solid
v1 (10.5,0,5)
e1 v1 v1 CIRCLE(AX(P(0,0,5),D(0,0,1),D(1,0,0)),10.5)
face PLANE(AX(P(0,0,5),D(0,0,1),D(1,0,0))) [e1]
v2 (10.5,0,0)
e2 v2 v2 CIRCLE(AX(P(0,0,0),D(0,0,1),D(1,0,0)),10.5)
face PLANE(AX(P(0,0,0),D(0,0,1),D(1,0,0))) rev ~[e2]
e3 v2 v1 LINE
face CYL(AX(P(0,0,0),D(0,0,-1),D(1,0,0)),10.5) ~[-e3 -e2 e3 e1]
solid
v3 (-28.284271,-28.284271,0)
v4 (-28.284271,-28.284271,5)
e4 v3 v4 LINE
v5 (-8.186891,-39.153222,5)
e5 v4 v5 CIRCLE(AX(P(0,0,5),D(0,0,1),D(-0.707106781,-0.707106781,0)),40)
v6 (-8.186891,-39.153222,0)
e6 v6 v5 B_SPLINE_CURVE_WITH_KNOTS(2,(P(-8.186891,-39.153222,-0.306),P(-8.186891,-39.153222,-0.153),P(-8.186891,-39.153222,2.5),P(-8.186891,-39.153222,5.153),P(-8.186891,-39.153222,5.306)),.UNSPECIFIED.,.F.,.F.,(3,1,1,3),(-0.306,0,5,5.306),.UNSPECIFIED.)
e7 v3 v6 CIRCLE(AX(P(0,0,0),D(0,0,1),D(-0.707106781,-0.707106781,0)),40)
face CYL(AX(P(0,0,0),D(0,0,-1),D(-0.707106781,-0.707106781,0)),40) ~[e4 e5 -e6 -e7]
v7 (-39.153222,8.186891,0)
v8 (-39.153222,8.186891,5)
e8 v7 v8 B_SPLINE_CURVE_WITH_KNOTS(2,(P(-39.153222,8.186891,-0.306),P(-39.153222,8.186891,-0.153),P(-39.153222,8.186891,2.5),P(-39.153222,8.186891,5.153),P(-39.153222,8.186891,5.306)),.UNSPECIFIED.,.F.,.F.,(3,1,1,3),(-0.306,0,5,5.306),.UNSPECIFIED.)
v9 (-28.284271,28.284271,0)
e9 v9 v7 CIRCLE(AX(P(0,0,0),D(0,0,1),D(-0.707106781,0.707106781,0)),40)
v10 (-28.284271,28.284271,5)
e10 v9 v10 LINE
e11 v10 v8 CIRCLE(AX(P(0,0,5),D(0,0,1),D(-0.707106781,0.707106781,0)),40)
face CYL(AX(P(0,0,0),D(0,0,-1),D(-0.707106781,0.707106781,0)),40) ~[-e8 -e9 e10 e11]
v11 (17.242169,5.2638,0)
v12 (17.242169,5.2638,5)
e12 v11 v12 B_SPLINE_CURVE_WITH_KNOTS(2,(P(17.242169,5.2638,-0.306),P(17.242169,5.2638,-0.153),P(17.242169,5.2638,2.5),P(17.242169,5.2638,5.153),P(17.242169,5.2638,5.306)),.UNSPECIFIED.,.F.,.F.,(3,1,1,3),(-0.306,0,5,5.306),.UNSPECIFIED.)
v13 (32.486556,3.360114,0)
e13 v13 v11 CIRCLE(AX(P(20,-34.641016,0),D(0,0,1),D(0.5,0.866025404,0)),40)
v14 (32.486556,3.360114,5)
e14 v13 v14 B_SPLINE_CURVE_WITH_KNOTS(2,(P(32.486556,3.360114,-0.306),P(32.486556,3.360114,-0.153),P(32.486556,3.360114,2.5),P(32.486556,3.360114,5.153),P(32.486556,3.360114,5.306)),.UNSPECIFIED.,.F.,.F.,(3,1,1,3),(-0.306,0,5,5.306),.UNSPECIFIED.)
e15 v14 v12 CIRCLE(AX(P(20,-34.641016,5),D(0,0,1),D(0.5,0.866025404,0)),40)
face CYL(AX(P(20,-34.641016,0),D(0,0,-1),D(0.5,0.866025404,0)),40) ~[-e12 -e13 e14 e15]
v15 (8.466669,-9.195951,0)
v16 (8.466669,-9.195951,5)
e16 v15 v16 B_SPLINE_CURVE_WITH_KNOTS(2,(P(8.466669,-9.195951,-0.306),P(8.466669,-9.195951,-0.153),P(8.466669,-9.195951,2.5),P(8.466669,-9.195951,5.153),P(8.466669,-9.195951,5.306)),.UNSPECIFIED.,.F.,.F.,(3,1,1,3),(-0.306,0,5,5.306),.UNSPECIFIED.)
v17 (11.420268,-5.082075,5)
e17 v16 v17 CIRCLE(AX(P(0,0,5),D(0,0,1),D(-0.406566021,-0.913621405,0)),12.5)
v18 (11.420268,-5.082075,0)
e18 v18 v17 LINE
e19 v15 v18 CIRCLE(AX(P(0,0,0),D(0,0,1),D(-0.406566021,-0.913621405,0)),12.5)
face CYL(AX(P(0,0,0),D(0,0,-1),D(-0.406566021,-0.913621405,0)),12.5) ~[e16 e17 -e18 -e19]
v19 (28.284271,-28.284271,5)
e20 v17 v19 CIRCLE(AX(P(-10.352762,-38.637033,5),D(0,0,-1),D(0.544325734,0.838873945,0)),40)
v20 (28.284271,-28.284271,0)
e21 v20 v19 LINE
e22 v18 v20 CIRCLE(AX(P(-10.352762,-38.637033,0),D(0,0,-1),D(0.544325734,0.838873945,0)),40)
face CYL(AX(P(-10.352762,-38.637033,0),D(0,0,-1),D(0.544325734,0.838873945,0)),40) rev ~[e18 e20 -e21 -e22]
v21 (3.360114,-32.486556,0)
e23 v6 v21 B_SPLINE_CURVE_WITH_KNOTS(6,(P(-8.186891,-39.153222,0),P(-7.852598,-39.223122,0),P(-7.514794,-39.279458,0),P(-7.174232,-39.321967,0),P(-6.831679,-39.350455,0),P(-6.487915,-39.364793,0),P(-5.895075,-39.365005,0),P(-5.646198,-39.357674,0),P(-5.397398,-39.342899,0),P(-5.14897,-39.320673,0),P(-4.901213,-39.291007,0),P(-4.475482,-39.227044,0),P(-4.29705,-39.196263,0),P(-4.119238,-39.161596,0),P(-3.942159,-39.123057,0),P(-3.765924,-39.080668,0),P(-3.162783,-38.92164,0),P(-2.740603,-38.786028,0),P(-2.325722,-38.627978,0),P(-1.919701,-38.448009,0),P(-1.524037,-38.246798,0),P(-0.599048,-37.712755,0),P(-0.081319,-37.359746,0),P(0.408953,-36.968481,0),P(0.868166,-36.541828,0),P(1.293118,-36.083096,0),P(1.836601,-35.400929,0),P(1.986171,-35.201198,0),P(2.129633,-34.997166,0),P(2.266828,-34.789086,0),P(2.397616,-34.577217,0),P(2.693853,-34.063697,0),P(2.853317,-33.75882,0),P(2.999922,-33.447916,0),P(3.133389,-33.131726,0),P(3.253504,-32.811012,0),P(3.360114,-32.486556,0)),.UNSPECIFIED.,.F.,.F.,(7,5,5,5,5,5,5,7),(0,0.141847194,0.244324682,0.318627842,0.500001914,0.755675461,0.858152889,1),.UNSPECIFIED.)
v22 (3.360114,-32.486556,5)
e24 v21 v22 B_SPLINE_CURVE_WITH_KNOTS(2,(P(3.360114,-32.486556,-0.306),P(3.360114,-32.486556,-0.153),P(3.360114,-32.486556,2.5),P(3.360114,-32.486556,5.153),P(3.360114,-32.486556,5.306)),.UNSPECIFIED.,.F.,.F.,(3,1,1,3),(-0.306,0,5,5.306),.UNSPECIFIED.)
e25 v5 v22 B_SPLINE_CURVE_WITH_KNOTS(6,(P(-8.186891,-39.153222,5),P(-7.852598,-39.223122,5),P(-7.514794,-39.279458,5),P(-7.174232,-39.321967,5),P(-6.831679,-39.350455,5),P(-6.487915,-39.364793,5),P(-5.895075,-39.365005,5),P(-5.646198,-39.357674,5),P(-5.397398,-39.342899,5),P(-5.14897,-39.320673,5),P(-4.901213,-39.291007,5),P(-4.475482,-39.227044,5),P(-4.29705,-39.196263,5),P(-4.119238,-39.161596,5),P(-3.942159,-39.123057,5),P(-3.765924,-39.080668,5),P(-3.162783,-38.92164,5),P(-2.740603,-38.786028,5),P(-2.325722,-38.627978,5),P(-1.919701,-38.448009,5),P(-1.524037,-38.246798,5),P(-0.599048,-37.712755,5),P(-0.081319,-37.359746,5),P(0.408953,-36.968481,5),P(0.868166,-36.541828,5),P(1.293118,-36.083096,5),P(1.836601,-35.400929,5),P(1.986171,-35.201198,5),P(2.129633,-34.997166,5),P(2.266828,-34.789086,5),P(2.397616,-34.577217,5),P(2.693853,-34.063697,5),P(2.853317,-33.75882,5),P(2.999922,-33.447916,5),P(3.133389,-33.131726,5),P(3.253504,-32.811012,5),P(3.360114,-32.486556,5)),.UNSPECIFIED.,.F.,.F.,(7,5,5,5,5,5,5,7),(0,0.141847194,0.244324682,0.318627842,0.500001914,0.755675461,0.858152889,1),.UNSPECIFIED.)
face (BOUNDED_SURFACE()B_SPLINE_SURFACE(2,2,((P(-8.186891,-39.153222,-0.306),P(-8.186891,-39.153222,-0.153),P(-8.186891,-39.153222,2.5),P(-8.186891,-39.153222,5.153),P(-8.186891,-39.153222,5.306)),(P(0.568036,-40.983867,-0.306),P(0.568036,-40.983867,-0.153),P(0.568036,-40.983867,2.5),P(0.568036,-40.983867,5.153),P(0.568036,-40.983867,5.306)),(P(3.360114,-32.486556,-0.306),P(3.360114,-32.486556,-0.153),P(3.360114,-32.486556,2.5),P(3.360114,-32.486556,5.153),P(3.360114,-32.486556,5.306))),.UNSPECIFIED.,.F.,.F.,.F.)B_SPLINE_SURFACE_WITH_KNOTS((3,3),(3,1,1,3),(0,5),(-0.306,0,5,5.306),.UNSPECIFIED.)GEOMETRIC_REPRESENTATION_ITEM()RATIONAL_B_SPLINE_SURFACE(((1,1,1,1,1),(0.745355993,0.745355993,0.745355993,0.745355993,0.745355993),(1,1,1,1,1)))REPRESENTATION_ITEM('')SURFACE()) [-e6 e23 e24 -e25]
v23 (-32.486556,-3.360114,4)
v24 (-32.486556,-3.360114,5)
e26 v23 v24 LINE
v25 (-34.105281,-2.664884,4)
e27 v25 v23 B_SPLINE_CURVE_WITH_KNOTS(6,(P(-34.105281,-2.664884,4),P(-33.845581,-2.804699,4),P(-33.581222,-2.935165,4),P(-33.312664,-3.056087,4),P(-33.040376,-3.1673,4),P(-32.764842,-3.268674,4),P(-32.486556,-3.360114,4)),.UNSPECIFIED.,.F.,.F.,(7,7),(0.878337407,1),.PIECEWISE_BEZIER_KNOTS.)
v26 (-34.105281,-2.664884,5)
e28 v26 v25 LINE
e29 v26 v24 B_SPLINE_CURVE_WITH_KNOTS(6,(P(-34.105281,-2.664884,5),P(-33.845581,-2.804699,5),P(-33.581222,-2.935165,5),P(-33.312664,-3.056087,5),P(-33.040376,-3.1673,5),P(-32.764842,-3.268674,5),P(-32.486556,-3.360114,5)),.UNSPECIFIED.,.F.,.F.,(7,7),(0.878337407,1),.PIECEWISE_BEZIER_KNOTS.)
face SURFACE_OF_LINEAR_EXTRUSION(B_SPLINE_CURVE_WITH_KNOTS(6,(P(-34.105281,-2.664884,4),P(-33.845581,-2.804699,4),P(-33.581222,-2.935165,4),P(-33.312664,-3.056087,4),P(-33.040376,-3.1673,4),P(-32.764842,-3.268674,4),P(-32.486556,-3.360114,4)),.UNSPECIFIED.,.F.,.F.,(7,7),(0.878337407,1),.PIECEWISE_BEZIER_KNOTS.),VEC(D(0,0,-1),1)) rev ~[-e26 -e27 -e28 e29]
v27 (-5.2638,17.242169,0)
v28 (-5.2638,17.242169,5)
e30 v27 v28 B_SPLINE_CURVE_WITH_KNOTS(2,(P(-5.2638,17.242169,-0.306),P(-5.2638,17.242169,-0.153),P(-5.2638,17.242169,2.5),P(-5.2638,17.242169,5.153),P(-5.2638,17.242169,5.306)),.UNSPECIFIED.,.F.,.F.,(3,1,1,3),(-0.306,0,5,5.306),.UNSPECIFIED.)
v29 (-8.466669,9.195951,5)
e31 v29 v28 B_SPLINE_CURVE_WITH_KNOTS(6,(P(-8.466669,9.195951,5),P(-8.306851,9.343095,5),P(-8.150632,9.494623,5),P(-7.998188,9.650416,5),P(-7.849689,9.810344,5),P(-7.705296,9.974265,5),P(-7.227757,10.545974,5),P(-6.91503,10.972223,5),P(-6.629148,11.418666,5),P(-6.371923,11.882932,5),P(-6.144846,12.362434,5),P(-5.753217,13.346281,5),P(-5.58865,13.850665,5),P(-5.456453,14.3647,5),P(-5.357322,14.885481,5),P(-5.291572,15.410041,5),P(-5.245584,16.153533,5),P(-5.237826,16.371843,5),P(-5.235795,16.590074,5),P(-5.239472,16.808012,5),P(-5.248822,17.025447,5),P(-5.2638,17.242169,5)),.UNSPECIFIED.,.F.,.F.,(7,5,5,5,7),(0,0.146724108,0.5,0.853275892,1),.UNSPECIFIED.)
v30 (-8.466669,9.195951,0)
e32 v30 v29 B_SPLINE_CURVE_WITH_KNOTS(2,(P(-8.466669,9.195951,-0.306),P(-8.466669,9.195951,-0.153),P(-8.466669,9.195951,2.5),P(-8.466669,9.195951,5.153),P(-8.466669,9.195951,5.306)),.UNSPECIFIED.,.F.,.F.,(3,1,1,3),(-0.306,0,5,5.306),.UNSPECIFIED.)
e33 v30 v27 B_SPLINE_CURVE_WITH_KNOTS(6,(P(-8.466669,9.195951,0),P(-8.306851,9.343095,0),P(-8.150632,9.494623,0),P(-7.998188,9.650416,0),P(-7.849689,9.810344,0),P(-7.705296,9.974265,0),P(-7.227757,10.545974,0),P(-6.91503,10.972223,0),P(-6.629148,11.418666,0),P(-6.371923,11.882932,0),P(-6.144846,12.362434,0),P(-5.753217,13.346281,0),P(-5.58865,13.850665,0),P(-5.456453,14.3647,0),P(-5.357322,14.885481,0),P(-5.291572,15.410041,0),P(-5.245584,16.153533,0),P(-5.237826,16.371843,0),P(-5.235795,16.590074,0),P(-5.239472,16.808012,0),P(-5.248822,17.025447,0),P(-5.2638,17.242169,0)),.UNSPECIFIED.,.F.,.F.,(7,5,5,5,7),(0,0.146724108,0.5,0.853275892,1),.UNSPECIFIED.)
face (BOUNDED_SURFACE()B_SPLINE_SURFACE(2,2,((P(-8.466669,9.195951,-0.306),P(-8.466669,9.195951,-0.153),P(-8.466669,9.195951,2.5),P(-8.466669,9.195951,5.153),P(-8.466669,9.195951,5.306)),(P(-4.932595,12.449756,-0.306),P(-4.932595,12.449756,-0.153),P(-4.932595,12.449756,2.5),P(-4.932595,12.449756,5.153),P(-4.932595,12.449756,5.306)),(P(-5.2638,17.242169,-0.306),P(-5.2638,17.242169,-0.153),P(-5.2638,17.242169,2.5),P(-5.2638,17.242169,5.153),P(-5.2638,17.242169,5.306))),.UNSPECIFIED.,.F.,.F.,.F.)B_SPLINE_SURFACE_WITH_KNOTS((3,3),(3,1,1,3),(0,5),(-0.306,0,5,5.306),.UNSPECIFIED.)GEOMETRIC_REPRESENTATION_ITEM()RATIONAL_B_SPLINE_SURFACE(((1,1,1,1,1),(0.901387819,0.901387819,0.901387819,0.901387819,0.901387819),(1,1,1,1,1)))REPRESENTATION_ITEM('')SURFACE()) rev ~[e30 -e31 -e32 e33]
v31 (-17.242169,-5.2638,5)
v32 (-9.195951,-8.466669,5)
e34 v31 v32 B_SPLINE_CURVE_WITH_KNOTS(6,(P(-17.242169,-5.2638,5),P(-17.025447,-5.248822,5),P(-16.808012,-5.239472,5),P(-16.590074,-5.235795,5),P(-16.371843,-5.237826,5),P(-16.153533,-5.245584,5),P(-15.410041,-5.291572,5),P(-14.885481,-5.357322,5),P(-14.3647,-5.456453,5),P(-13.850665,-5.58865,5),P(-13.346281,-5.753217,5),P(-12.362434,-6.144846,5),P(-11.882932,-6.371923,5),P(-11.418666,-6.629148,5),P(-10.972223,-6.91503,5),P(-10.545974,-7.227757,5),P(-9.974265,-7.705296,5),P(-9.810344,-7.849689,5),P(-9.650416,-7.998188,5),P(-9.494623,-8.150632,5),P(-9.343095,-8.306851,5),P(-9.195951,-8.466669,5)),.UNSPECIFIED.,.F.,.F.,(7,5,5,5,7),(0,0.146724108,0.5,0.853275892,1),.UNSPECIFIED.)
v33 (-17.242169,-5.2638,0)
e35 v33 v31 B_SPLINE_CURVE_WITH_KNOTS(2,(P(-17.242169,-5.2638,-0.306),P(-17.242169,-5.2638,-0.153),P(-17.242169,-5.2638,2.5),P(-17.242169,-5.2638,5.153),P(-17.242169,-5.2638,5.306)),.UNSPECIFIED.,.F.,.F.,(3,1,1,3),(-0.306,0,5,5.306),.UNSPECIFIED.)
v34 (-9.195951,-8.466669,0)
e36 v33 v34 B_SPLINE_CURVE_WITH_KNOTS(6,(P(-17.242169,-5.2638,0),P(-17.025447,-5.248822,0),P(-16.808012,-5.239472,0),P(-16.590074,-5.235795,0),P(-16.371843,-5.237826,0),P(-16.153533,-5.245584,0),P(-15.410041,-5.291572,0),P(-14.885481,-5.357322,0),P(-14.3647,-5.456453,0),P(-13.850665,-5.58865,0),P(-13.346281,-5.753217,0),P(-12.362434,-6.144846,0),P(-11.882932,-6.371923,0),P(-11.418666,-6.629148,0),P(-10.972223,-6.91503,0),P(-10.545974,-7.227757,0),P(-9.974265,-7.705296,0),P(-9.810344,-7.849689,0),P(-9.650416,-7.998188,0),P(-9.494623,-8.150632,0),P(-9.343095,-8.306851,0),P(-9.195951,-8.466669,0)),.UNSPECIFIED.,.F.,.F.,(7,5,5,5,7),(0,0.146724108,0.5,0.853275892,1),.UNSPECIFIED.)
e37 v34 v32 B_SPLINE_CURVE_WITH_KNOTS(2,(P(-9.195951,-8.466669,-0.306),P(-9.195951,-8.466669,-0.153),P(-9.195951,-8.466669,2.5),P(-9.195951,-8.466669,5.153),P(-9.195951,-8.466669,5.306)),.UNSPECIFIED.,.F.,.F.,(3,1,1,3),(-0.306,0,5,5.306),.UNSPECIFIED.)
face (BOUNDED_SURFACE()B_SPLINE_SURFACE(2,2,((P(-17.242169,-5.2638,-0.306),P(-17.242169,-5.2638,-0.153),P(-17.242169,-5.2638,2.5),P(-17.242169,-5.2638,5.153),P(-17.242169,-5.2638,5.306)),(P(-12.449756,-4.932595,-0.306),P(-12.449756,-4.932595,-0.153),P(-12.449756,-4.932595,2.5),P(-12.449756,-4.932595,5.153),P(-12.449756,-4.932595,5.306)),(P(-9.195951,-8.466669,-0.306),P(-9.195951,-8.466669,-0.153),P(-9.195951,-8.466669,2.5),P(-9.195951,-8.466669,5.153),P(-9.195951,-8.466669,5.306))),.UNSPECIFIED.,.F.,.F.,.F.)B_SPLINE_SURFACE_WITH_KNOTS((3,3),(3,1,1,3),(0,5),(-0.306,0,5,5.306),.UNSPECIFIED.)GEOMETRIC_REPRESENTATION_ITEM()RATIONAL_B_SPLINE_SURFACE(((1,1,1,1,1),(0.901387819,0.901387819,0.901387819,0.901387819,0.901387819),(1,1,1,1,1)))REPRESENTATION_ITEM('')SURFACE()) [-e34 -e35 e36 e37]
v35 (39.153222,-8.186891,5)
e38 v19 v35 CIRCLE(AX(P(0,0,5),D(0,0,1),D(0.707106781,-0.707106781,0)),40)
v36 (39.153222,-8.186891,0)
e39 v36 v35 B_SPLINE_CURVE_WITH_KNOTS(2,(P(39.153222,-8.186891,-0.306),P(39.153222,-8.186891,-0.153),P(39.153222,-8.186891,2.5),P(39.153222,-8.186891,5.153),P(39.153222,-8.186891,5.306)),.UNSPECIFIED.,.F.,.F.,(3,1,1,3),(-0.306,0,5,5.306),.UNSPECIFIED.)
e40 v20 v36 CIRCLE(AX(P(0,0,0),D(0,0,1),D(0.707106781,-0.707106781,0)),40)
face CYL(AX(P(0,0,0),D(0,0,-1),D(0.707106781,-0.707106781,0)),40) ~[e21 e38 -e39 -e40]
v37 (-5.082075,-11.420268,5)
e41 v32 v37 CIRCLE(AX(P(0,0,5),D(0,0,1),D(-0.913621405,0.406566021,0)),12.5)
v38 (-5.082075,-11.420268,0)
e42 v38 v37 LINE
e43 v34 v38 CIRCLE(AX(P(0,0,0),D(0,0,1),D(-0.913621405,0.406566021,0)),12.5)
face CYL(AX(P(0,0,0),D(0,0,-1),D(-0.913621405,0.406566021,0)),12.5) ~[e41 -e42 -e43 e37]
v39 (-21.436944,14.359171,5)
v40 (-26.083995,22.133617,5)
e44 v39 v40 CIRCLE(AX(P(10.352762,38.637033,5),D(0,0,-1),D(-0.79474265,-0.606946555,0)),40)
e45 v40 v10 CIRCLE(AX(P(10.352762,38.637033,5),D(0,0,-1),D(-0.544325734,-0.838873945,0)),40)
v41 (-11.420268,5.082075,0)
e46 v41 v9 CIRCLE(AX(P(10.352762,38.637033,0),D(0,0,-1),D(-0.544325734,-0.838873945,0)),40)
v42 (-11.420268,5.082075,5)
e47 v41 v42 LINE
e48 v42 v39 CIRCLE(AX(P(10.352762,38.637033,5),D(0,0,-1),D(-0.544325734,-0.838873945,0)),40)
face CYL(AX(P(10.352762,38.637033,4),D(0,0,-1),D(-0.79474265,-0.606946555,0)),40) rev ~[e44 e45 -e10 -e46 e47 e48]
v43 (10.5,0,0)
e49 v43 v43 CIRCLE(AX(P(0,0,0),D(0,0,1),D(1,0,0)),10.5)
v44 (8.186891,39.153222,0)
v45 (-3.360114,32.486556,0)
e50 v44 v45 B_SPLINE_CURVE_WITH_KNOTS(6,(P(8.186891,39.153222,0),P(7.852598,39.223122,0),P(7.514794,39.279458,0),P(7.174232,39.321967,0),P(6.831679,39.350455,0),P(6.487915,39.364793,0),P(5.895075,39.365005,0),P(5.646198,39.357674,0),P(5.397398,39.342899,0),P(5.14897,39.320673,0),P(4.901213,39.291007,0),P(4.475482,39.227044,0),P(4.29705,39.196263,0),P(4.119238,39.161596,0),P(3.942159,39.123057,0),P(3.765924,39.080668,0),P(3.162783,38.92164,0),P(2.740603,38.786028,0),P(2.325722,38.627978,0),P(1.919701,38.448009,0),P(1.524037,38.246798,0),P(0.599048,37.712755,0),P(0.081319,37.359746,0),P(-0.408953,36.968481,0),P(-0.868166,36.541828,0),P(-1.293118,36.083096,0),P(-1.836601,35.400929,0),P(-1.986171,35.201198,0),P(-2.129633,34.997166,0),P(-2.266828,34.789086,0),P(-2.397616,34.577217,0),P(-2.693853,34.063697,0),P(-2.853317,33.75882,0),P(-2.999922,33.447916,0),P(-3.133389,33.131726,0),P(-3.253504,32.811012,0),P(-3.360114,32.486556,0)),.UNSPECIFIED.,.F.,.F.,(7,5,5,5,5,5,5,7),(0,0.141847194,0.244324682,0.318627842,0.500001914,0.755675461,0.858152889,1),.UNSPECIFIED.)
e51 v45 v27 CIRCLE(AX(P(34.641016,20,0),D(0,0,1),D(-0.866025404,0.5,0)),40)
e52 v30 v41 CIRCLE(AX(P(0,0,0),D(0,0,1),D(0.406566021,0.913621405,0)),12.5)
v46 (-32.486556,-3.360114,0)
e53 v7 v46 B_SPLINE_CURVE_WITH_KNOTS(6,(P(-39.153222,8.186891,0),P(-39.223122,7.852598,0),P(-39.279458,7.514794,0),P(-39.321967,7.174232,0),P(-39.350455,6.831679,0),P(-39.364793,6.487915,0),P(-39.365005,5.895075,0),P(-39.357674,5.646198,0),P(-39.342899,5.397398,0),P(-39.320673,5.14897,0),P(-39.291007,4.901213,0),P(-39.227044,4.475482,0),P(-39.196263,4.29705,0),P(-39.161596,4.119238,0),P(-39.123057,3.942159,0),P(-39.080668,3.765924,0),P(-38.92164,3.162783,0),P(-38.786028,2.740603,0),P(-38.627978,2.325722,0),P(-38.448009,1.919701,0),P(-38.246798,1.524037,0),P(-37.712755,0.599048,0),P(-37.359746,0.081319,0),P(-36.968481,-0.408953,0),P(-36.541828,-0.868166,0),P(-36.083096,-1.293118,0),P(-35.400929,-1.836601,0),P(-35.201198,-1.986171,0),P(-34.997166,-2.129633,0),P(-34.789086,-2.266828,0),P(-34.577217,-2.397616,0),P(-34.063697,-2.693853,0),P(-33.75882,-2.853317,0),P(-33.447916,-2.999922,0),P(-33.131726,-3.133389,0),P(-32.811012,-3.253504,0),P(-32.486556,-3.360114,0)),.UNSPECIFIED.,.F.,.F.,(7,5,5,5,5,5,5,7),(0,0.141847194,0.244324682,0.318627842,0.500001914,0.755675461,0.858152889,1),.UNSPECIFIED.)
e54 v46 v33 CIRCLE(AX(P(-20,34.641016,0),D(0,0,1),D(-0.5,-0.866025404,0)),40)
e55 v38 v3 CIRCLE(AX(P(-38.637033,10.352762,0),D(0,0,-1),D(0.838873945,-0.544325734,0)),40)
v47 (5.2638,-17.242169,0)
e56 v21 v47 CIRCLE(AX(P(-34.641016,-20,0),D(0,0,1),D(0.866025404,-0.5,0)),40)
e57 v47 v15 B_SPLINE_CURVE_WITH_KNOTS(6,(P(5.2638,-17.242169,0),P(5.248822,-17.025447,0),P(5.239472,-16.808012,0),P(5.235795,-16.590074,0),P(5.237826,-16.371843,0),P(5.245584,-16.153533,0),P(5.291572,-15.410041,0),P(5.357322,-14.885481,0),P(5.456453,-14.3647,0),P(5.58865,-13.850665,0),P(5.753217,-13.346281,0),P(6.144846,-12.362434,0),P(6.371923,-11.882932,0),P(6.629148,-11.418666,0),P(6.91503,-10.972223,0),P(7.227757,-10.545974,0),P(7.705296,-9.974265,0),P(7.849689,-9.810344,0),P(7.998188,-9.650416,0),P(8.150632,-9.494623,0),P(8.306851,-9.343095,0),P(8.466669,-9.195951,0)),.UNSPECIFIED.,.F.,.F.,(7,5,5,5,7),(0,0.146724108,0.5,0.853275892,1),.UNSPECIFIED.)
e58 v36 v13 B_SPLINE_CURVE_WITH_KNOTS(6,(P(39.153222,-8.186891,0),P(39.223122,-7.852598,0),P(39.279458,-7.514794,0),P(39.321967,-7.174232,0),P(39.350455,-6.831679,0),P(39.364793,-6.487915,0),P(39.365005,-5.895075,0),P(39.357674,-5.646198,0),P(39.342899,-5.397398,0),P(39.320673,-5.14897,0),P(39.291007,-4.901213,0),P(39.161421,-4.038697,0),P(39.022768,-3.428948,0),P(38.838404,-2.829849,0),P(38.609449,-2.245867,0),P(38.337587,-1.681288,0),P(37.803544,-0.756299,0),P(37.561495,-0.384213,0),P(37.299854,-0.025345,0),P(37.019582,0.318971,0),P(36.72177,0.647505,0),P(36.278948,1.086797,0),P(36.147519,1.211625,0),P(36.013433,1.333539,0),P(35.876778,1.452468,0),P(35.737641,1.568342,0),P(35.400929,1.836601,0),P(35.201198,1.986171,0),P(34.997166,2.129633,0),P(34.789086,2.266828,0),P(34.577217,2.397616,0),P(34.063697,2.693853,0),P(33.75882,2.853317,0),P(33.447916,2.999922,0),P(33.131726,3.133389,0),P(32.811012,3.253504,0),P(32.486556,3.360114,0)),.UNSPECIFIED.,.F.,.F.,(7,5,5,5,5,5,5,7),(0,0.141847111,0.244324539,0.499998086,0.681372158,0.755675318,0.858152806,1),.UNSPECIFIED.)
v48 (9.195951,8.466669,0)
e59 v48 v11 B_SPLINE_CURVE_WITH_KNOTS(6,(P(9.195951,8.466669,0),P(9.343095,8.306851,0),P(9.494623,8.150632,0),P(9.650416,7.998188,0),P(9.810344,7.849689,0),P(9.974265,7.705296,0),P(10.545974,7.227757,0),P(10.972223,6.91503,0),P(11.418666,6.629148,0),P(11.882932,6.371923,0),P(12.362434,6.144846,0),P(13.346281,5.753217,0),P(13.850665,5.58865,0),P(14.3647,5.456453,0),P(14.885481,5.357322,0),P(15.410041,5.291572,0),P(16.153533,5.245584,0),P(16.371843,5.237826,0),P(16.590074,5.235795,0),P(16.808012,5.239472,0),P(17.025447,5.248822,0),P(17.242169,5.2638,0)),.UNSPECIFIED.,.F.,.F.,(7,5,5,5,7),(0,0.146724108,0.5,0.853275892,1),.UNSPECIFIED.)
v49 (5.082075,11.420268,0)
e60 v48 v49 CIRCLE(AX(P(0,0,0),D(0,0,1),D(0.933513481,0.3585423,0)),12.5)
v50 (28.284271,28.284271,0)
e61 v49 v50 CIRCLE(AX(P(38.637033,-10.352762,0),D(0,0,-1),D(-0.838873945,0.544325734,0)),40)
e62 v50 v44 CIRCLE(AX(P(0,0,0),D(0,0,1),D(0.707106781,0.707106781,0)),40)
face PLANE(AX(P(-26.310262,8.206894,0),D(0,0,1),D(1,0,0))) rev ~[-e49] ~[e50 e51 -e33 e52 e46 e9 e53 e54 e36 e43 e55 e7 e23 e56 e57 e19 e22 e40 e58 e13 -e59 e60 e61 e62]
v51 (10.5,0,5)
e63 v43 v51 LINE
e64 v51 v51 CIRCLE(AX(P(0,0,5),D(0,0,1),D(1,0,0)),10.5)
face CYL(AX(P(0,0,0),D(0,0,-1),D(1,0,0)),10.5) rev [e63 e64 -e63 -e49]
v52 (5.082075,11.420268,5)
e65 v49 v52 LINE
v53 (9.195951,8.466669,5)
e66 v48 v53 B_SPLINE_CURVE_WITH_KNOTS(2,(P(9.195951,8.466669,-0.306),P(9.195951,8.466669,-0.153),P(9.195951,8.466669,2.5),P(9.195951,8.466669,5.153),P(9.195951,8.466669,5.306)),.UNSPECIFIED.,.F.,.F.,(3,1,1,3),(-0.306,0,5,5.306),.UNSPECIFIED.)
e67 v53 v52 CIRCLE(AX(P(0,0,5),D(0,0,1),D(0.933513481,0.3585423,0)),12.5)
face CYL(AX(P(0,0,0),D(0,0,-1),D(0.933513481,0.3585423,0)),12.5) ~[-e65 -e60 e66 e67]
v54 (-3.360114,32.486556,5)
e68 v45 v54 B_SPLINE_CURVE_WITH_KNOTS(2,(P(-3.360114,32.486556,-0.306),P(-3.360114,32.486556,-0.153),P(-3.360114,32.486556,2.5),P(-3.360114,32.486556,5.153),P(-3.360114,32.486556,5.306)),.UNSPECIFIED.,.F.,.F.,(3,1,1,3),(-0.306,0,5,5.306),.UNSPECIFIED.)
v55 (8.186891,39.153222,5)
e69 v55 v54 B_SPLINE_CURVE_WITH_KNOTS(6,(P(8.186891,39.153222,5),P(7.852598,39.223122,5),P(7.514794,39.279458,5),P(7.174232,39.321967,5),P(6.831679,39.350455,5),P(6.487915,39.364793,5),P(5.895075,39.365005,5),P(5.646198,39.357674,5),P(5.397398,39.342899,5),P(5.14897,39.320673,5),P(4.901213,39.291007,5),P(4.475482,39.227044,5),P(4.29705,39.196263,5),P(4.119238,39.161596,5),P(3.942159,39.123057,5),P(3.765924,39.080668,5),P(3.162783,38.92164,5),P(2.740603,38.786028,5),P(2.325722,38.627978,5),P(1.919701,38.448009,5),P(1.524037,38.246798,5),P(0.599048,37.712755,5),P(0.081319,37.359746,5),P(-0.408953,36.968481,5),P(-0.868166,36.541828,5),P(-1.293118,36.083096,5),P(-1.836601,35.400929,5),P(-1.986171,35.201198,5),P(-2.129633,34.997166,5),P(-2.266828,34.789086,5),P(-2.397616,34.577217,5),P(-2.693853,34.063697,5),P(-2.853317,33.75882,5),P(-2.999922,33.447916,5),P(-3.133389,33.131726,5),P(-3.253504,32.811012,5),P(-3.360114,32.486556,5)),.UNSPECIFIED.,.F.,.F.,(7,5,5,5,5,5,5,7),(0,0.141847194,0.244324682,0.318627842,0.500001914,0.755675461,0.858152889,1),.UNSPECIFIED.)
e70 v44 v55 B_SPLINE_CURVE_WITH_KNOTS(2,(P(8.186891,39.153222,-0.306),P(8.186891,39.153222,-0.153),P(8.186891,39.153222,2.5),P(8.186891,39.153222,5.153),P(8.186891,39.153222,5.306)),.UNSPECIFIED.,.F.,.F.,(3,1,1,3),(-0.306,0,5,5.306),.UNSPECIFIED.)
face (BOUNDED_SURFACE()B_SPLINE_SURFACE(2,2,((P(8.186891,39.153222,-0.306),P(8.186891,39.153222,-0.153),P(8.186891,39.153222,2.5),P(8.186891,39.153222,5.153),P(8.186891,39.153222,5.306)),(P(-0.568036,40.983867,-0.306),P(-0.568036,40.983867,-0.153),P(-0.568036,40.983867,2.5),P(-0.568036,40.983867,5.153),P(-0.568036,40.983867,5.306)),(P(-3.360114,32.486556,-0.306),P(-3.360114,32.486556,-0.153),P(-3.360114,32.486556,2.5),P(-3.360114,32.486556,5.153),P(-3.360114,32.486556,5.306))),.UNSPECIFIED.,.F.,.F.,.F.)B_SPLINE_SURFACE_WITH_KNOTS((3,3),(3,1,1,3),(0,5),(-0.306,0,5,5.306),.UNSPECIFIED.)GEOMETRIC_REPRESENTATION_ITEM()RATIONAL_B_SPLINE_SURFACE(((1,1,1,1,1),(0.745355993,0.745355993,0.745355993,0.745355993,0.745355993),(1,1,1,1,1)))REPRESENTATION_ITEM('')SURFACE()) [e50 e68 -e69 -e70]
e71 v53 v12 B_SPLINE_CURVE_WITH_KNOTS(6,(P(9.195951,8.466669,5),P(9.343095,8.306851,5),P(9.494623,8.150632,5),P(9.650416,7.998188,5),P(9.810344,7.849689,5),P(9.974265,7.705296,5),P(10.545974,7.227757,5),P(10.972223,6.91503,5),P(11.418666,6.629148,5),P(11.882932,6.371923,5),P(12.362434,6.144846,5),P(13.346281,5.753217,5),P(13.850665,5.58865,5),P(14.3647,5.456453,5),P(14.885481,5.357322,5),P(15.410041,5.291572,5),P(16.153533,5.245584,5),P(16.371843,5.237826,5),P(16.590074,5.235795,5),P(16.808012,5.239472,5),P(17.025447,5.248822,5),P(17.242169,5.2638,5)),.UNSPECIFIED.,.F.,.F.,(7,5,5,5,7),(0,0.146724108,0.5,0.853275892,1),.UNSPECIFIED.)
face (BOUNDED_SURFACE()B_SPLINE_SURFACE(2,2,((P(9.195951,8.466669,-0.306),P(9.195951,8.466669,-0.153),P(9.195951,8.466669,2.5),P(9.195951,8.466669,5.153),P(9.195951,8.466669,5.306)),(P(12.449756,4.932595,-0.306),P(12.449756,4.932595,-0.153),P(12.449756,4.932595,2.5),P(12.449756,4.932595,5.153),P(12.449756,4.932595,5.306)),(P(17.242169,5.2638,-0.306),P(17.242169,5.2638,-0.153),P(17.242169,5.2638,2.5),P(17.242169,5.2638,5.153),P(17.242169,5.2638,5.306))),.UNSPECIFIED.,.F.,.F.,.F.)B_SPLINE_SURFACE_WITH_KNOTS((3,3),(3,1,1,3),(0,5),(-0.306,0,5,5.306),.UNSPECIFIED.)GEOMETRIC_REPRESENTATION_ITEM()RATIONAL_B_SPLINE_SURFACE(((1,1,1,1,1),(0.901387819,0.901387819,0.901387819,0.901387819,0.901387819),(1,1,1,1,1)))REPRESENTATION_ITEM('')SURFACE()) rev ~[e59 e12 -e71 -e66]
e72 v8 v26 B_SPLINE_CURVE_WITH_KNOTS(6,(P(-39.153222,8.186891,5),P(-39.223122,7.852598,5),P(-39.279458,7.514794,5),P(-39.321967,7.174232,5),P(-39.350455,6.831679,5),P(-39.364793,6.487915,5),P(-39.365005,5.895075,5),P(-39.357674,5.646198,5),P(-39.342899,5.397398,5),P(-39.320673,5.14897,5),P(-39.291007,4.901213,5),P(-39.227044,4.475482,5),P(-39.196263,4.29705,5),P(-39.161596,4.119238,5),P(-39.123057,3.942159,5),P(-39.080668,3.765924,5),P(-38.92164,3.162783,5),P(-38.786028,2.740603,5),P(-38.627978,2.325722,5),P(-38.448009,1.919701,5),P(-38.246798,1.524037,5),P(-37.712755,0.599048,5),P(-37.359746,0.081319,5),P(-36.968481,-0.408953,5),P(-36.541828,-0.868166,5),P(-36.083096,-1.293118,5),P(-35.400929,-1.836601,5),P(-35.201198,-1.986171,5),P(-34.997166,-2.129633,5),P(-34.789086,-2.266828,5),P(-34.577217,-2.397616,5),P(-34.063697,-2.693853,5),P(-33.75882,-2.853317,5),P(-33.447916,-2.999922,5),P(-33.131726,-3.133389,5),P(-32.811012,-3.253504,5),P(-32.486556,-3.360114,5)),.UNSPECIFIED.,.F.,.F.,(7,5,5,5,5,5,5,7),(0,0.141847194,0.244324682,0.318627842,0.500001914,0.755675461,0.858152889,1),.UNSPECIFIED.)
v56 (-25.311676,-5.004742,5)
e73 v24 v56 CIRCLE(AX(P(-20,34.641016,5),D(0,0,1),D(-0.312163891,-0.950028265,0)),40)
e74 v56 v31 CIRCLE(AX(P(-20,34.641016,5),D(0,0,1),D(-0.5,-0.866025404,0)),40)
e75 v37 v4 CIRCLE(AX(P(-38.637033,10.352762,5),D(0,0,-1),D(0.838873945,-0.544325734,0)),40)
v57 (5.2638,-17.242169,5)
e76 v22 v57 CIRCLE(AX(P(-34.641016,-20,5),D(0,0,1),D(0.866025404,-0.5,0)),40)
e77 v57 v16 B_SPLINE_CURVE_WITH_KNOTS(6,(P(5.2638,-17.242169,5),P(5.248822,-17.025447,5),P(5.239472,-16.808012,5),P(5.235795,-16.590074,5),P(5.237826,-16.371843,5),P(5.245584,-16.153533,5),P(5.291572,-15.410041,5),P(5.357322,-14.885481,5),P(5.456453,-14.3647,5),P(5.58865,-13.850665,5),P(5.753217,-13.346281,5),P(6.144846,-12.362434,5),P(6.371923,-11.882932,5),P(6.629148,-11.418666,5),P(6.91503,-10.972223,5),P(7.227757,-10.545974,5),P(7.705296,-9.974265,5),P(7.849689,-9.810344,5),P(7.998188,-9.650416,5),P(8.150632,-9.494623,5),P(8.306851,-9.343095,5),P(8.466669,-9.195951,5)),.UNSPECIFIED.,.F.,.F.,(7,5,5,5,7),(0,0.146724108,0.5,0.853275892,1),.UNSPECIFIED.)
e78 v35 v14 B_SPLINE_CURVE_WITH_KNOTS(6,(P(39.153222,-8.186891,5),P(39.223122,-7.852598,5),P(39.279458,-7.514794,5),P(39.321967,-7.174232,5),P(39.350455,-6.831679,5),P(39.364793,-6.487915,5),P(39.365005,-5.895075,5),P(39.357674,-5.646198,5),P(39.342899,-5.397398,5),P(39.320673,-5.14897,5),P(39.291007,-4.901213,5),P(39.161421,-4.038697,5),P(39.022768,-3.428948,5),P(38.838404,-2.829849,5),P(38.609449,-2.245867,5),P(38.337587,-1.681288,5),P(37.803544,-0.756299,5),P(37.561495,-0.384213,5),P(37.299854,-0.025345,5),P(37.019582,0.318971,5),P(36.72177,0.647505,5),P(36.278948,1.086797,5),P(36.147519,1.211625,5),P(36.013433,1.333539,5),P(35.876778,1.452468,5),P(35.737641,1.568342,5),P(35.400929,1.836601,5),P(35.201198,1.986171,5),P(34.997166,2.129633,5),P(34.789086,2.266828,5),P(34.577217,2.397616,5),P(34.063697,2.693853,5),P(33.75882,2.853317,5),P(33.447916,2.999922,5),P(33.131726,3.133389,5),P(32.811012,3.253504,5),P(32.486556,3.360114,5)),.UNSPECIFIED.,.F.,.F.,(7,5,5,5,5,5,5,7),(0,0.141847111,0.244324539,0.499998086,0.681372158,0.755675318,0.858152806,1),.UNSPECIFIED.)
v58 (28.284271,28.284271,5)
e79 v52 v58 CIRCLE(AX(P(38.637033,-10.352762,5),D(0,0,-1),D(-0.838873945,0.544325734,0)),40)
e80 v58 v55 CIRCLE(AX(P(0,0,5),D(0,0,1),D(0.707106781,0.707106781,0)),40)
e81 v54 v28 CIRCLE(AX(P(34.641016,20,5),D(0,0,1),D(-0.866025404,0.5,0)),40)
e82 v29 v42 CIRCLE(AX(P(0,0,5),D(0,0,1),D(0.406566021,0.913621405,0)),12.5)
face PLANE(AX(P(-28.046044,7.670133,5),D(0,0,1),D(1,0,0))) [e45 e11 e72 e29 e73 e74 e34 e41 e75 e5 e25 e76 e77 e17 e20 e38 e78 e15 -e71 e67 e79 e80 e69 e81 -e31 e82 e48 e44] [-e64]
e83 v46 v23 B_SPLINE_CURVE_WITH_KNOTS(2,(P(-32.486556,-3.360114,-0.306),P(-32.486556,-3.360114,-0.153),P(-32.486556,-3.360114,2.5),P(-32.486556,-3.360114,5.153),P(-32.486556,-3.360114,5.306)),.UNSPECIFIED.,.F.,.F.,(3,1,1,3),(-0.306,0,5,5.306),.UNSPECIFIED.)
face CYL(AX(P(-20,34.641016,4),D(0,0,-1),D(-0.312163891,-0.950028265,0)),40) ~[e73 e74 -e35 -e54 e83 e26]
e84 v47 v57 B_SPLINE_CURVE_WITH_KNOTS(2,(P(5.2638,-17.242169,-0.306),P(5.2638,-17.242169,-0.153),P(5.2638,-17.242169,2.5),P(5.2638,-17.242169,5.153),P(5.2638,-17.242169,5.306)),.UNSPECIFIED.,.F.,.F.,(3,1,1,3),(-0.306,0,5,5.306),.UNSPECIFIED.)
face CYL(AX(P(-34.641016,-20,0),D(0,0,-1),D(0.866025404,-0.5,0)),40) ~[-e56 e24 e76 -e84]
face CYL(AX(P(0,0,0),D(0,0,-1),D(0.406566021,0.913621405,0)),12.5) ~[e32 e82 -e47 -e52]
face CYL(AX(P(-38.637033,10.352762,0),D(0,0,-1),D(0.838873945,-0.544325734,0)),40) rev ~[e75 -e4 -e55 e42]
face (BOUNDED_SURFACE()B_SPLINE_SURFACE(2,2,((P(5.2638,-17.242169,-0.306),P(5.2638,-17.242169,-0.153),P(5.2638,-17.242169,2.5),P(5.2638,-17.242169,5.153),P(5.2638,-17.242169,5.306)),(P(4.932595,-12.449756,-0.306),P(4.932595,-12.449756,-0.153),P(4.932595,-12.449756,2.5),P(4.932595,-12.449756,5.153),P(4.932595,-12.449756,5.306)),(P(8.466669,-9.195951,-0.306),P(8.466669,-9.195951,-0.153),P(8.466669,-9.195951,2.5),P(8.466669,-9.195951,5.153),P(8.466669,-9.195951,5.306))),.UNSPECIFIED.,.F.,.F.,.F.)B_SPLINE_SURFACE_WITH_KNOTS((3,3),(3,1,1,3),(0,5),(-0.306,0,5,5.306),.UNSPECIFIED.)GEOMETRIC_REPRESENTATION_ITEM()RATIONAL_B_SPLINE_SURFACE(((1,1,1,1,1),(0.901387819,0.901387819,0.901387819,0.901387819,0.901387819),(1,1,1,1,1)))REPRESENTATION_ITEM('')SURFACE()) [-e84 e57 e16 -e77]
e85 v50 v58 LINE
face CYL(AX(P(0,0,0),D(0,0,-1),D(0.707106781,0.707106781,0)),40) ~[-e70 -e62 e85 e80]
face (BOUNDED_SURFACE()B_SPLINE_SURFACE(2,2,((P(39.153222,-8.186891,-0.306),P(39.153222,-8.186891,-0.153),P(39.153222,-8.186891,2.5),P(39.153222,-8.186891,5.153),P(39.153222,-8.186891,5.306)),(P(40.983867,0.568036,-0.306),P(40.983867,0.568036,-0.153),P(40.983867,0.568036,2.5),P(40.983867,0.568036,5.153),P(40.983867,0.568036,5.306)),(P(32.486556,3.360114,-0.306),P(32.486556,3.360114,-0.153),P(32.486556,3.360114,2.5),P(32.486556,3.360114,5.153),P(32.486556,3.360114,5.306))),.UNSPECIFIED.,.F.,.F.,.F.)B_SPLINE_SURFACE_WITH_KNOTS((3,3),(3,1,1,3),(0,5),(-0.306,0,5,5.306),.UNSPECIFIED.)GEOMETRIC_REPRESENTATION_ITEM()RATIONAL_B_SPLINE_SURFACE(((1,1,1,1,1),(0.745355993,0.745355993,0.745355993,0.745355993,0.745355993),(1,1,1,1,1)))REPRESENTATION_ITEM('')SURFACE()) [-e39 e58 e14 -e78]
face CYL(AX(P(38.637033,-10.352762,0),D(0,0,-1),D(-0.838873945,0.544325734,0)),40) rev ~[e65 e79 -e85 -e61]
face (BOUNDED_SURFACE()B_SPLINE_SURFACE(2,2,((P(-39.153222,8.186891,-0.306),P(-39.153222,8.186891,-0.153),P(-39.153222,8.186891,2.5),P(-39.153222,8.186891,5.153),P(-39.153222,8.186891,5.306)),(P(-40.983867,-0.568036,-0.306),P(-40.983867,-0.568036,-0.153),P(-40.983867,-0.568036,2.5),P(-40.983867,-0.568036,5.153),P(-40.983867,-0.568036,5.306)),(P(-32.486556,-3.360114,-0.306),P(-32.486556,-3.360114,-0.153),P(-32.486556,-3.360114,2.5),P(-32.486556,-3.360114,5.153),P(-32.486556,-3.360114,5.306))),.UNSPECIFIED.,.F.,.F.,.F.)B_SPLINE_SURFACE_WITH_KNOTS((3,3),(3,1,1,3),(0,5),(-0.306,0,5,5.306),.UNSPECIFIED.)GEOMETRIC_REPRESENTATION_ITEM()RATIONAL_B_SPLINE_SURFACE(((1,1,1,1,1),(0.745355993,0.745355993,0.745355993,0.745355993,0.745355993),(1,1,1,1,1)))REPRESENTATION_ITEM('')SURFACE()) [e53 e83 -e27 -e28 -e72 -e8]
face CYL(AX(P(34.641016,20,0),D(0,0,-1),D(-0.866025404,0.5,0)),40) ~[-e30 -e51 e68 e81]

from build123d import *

# Parameters (mm, degrees)
F0_R     = 10.5
F1_DEPTH = 5
F2_R     = 10
F4_DEPTH = 1
F5_DEPTH = 1
F6_DEPTH = 5
F7_R     = 10


with BuildPart() as f1:
    # F0 (on Top) → F1 (new body)
    with BuildSketch(Plane.XY):
        with BuildLine():
            ThreePointArc((-11.6689185103, -4.481778754), (-12.4957774549, 0.3248781274), (-11.4202675565, 5.082075259))
            ThreePointArc((-11.4202675565, 5.082075259), (-22.0035263766, 15.1195796357), (-28.2842712475, 28.2842712475))
            ThreePointArc((-28.2842712475, 28.2842712475), (-36.9551813005, 15.3073372946), (-40, 0))
            ThreePointArc((-40, 0), (-26.25, -4.8676854218), (-11.6689185103, -4.481778754))
        make_face()
        with BuildLine():
            ThreePointArc((5.082075259, 11.4202675565), (15.1195796357, 22.0035263766), (28.2842712475, 28.2842712475))
            ThreePointArc((28.2842712475, 28.2842712475), (15.3073372946, 36.9551813005), (0, 40))
            ThreePointArc((0, 40), (-4.8676854218, 26.25), (-4.481778754, 11.6689185103))
            ThreePointArc((-4.481778754, 11.6689185103), (0.3248781274, 12.4957774549), (5.082075259, 11.4202675565))
        make_face()
        with BuildLine():
            ThreePointArc((11.6689185103, 4.481778754), (9.0655725015, 8.6061254476), (5.082075259, 11.4202675565))
            ThreePointArc((5.082075259, 11.4202675565), (0.3248781274, 12.4957774549), (-4.481778754, 11.6689185103))
            ThreePointArc((-4.481778754, 11.6689185103), (-8.6061254476, 9.0655725015), (-11.4202675565, 5.082075259))
            ThreePointArc((-11.4202675565, 5.082075259), (-12.4957774549, 0.3248781274), (-11.6689185103, -4.481778754))
            ThreePointArc((-11.6689185103, -4.481778754), (-9.0655725015, -8.6061254476), (-5.082075259, -11.4202675565))
            ThreePointArc((-5.082075259, -11.4202675565), (-0.3248781274, -12.4957774549), (4.481778754, -11.6689185103))
            ThreePointArc((4.481778754, -11.6689185103), (8.6061254476, -9.0655725015), (11.4202675565, -5.082075259))
            ThreePointArc((11.4202675565, -5.082075259), (12.2270876429, -2.597754371), (12.5, 0))
            ThreePointArc((12.5, 0), (12.2904735747, 2.2790917732), (11.6689185103, 4.481778754))
        make_face()
        Circle(F0_R, mode=Mode.SUBTRACT)
        with BuildLine():
            ThreePointArc((40, 0), (26.25, 4.8676854218), (11.6689185103, 4.481778754))
            ThreePointArc((11.6689185103, 4.481778754), (12.2904735747, 2.2790917732), (12.5, 0))
            ThreePointArc((12.5, 0), (12.2270876429, -2.597754371), (11.4202675565, -5.082075259))
            ThreePointArc((11.4202675565, -5.082075259), (22.0035263766, -15.1195796357), (28.2842712475, -28.2842712475))
            ThreePointArc((28.2842712475, -28.2842712475), (36.9551813005, -15.3073372946), (40, 0))
        make_face()
        with BuildLine():
            ThreePointArc((4.481778754, -11.6689185103), (-0.3248781274, -12.4957774549), (-5.082075259, -11.4202675565))
            ThreePointArc((-5.082075259, -11.4202675565), (-15.1195796357, -22.0035263766), (-28.2842712475, -28.2842712475))
            ThreePointArc((-28.2842712475, -28.2842712475), (-15.3073372946, -36.9551813005), (0, -40))
            ThreePointArc((0, -40), (4.8676854218, -26.25), (4.481778754, -11.6689185103))
        make_face()
    extrude(amount=F1_DEPTH)

    # F2
    f2_edges = [f1.edges().sort_by_distance(p)[0] for p in [
        (-40, 0, 2.5),
        (0, -40, 2.5),
        (40, 0, 2.5),
        (0, 40, 2.5),
    ]]
    fillet(f2_edges, radius=F2_R)

    # F3 (on face) → F4 (cut)
    with BuildSketch(Plane.XY.offset(5)):
        with BuildLine():
            ThreePointArc((-25.3116756684, -5.0047415232), (-25.3001707478, 5.0625806649), (-21.4369441775, 14.3591708391))
            ThreePointArc((-21.4369441775, 14.3591708391), (-23.9812309448, 18.1144371651), (-26.0839950043, 22.1336166391))
            ThreePointArc((-26.0839950043, 22.1336166391), (-32.548865417, 10.5282069215), (-34.1052807152, -2.6648842851))
            add(Edge.make_bspline(
                [(-34.1052807152, -2.6648842851), (-33.8455808028, -2.8046985599), (-33.5812223291, -2.9351651438), (-33.3126639182, -3.0560868057), (-33.040376273, -3.1672997314), (-32.7648420347, -3.2686740675), (-32.4865556414, -3.3601144662)],
                knots=[0.8783374065, 0.8783374065, 0.8783374065, 0.8783374065, 0.8783374065, 0.8783374065, 0.8783374065, 1, 1, 1, 1, 1, 1, 1], degree=6))
            ThreePointArc((-32.4865556414, -3.3601144662), (-28.9370274128, -4.347822521), (-25.3116756684, -5.0047415232))
        make_face()
    extrude(amount=-F4_DEPTH, mode=Mode.SUBTRACT)

    # F5 (add, through all): faces of the model
    f5_faces = [f1.faces().sort_by_distance(p)[0] for p in [
        (-28.4327754327, 7.5387813356, 4),
        (-28.4327754327, 7.5387813356, 4),
        (-28.4327754327, 7.5387813356, 4),
        (-28.4327754327, 7.5387813356, 4),
    ]]
    extrude(f5_faces, amount=F5_DEPTH)

    # F7
    f7_edges = [f1.edges().sort_by_distance(p)[0] for p in [
        (-11.668919, -4.481779, 2.5),
        (4.481779, -11.668919, 2.5),
        (11.668919, 4.481779, 2.5),
        (-4.481779, 11.668919, 2.5),
    ]]
    fillet(f7_edges, radius=F7_R)


with BuildPart() as f6:
    # F0 (on Top) → F6 (new body, through all)
    with BuildSketch(Plane.XY):
        Circle(F0_R)
    extrude(amount=F6_DEPTH)


solid = Compound([f1.part, f6.part])
